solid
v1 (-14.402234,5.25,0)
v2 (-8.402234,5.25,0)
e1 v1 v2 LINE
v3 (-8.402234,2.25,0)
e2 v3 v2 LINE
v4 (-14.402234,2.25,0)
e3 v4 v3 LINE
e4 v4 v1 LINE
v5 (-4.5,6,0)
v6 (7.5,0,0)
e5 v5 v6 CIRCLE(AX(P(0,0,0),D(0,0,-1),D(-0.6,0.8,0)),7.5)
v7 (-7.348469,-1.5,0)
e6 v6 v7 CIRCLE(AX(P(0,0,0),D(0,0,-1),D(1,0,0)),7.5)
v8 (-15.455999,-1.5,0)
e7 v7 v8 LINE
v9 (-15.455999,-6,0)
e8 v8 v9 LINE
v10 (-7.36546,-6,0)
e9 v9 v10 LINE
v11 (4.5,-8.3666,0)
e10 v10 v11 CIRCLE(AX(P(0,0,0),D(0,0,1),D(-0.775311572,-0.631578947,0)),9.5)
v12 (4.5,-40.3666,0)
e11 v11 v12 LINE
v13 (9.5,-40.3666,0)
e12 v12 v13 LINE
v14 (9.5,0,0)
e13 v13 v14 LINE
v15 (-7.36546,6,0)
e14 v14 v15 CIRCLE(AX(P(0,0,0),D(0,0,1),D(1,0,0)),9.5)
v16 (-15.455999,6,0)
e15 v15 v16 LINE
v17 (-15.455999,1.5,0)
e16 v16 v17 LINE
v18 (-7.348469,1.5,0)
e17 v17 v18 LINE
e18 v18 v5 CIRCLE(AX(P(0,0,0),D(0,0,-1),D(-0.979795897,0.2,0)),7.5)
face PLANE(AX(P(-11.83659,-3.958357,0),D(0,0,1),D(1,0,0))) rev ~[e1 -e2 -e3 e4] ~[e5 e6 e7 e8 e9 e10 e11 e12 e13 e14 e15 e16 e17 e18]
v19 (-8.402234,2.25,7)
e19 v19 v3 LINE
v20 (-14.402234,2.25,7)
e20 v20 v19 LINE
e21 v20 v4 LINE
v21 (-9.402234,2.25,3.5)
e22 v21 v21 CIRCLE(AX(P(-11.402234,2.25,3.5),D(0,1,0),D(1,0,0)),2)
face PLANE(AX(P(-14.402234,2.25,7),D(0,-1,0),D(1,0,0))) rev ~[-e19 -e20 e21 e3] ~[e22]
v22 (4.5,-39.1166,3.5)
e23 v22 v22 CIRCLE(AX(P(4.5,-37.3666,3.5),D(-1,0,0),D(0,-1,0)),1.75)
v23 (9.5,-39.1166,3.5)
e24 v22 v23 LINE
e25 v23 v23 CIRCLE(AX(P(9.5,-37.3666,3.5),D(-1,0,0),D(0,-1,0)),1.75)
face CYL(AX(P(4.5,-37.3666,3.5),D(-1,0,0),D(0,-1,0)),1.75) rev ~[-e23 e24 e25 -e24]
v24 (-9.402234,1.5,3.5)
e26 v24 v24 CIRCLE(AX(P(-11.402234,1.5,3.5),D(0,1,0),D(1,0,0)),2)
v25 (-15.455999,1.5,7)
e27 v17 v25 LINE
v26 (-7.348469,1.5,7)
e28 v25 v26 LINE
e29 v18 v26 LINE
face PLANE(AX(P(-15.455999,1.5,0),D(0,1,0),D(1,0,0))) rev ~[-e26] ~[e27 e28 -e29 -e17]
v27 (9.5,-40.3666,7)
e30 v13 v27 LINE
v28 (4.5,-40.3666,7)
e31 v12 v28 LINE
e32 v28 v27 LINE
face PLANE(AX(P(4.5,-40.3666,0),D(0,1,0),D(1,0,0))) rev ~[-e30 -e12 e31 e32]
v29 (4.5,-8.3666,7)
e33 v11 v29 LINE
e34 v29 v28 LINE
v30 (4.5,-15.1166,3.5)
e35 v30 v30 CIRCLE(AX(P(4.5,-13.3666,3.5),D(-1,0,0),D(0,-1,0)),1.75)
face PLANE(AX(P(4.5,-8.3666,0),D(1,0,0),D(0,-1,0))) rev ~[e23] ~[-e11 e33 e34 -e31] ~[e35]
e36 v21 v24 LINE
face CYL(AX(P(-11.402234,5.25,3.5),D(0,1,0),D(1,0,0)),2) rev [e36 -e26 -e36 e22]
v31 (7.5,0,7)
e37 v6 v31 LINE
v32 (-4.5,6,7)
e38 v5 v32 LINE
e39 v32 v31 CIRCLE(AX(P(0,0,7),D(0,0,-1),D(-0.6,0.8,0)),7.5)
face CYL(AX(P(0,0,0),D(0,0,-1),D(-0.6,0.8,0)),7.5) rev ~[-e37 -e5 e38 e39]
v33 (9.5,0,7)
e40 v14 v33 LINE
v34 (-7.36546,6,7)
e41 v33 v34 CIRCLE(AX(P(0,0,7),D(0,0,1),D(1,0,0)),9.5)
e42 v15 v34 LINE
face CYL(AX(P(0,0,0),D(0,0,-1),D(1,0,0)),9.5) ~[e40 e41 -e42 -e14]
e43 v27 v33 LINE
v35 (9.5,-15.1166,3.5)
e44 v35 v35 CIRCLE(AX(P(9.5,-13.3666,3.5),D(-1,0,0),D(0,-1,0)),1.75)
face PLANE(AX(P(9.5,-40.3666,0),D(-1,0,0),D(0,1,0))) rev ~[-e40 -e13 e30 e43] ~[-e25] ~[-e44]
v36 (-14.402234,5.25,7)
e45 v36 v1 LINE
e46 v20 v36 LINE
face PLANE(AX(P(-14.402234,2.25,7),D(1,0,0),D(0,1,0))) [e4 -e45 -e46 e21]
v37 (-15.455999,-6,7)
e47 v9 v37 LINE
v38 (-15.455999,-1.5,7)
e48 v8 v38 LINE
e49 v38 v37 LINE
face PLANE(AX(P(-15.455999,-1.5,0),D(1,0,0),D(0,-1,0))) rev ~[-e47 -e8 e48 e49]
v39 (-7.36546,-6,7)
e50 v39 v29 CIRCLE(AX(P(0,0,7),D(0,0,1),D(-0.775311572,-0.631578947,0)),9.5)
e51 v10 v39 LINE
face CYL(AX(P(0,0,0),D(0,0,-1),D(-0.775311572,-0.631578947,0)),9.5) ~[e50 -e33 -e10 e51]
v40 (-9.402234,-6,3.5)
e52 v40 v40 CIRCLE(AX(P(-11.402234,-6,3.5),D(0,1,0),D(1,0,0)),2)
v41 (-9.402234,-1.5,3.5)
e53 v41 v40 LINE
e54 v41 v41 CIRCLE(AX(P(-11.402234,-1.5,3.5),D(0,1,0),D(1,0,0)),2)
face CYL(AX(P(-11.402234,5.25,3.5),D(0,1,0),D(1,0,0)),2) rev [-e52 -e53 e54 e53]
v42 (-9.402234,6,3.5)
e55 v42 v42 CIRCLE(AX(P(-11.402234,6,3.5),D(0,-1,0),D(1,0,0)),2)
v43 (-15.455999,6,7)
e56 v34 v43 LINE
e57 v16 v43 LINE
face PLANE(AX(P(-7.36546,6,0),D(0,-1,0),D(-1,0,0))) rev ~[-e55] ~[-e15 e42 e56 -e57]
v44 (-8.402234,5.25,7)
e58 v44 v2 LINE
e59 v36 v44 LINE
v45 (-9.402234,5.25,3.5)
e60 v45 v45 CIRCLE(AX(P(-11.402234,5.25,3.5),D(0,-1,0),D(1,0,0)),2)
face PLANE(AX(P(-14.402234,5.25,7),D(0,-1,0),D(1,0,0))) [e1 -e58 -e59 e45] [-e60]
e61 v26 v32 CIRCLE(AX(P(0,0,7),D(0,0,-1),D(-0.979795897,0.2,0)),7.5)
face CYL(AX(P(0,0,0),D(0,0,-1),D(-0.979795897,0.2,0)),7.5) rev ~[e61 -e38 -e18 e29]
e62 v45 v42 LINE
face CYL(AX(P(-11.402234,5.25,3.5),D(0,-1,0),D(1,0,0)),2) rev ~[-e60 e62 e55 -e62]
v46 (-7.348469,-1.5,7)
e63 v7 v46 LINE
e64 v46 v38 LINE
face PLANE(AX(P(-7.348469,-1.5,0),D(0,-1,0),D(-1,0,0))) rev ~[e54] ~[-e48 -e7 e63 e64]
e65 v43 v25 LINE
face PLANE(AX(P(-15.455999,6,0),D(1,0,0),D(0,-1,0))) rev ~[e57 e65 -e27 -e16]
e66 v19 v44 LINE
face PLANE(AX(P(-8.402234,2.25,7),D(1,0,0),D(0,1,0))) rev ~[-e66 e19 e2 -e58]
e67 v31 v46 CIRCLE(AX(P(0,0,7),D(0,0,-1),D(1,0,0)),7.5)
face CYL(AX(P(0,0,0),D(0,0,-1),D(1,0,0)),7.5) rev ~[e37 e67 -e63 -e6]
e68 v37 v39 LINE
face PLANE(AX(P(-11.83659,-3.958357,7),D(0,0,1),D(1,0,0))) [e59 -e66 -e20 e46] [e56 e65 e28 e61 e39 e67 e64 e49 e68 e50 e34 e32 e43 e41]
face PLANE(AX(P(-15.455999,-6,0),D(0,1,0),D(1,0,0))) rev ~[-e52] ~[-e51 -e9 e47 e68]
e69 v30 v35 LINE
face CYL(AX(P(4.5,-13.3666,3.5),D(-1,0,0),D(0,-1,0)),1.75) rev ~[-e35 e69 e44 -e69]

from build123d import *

# Parameters (mm, degrees)
F1_DEPTH      = 7
F2_W          = 6
F2_H          = 3
F3_DEPTH      = 7.001
F4_R          = 1.75
F5_DEPTH      = 5.001
F6_R          = 2
F7_DEPTH      = 4.251
F7_DEPTH_BACK = 45.6176002653


# Not quite as in the source:
# - a feature names something its author has since deleted; it is built from what else it names


with BuildPart() as f1:
    # F0 (on Top) → F1 (new body)
    with BuildSketch(Plane.XY):
        with BuildLine():
            ThreePointArc((-7.3654599313, -6), (-8.6701827743, -3.8830311175), (-9.3808315196, -1.5))
            Line((-9.3808315196, -1.5), (-15.4559988071, -1.5))
            Line((-15.4559988071, -1.5), (-15.4559988071, -6))
            Line((-15.4559988071, -6), (-7.3654599313, -6))
        make_face()
        with BuildLine():
            ThreePointArc((-4.5, 6), (3.3541019662, 6.7082039325), (7.5, 0))
            ThreePointArc((7.5, 0), (0.753817215, -7.4620211475), (-7.3484692283, -1.5))
            Line((-7.3484692283, -1.5), (-9.3808315196, -1.5))
            ThreePointArc((-9.3808315196, -1.5), (-8.6701827743, -3.8830311175), (-7.3654599313, -6))
            ThreePointArc((-7.3654599313, -6), (-1.8582019154, -9.3164953519), (4.5, -8.3666002653))
            ThreePointArc((4.5, -8.3666002653), (8.1547532152, -4.8733971724), (9.5, 0))
            ThreePointArc((9.5, 0), (3.1841899011, 8.9504711984), (-7.3654599313, 6))
            Line((-7.3654599313, 6), (-4.5, 6))
        make_face()
        with BuildLine():
            ThreePointArc((-7.3484692283, 1.5), (-6.3371173071, 4.0113519213), (-4.5, 6))
            Line((-4.5, 6), (-7.3654599313, 6))
            ThreePointArc((-7.3654599313, 6), (-8.6701827743, 3.8830311175), (-9.3808315196, 1.5))
            Line((-9.3808315196, 1.5), (-7.3484692283, 1.5))
        make_face()
        with BuildLine():
            ThreePointArc((-9.3808315196, 1.5), (-8.6701827743, 3.8830311175), (-7.3654599313, 6))
            Line((-7.3654599313, 6), (-15.4559988071, 6))
            Line((-15.4559988071, 6), (-15.4559988071, 1.5))
            Line((-15.4559988071, 1.5), (-9.3808315196, 1.5))
        make_face()
        with BuildLine():
            Line((9.5, -40.3666002653), (9.5, 0))
            ThreePointArc((9.5, 0), (8.1547532152, -4.8733971724), (4.5, -8.3666002653))
            Line((4.5, -8.3666002653), (4.5, -40.3666002653))
            Line((4.5, -40.3666002653), (9.5, -40.3666002653))
        make_face()
    extrude(amount=F1_DEPTH)

    # F2 (on face) → F3 (cut, through all)
    with BuildSketch(Plane.XY.offset(7)):
        with Locations((-11.4022340177, 3.75)):
            Rectangle(F2_W, F2_H)
    extrude(amount=-F3_DEPTH, mode=Mode.SUBTRACT)

    # F4 (on face) → F5 (cut, through all)
    with BuildSketch(Plane(origin=(4.5, 0, 0), x_dir=(0, -1, 0), z_dir=(-1, 0, 0))):
        with Locations((13.3666002653, 3.5)):
            Circle(F4_R)
        with Locations((37.3666002653, 3.5)):
            Circle(F4_R)
    extrude(amount=-F5_DEPTH, mode=Mode.SUBTRACT)

    # F6 (on face) → F7 (cut, two sides)
    with BuildSketch(Plane.XZ.offset(-5.25)) as f7_sk:
        with Locations((-11.4022340177, 3.5)):
            Circle(F6_R)
    extrude(amount=-F7_DEPTH, mode=Mode.SUBTRACT)
    extrude(f7_sk.sketch, amount=F7_DEPTH_BACK, mode=Mode.SUBTRACT)


solid = f1.part
